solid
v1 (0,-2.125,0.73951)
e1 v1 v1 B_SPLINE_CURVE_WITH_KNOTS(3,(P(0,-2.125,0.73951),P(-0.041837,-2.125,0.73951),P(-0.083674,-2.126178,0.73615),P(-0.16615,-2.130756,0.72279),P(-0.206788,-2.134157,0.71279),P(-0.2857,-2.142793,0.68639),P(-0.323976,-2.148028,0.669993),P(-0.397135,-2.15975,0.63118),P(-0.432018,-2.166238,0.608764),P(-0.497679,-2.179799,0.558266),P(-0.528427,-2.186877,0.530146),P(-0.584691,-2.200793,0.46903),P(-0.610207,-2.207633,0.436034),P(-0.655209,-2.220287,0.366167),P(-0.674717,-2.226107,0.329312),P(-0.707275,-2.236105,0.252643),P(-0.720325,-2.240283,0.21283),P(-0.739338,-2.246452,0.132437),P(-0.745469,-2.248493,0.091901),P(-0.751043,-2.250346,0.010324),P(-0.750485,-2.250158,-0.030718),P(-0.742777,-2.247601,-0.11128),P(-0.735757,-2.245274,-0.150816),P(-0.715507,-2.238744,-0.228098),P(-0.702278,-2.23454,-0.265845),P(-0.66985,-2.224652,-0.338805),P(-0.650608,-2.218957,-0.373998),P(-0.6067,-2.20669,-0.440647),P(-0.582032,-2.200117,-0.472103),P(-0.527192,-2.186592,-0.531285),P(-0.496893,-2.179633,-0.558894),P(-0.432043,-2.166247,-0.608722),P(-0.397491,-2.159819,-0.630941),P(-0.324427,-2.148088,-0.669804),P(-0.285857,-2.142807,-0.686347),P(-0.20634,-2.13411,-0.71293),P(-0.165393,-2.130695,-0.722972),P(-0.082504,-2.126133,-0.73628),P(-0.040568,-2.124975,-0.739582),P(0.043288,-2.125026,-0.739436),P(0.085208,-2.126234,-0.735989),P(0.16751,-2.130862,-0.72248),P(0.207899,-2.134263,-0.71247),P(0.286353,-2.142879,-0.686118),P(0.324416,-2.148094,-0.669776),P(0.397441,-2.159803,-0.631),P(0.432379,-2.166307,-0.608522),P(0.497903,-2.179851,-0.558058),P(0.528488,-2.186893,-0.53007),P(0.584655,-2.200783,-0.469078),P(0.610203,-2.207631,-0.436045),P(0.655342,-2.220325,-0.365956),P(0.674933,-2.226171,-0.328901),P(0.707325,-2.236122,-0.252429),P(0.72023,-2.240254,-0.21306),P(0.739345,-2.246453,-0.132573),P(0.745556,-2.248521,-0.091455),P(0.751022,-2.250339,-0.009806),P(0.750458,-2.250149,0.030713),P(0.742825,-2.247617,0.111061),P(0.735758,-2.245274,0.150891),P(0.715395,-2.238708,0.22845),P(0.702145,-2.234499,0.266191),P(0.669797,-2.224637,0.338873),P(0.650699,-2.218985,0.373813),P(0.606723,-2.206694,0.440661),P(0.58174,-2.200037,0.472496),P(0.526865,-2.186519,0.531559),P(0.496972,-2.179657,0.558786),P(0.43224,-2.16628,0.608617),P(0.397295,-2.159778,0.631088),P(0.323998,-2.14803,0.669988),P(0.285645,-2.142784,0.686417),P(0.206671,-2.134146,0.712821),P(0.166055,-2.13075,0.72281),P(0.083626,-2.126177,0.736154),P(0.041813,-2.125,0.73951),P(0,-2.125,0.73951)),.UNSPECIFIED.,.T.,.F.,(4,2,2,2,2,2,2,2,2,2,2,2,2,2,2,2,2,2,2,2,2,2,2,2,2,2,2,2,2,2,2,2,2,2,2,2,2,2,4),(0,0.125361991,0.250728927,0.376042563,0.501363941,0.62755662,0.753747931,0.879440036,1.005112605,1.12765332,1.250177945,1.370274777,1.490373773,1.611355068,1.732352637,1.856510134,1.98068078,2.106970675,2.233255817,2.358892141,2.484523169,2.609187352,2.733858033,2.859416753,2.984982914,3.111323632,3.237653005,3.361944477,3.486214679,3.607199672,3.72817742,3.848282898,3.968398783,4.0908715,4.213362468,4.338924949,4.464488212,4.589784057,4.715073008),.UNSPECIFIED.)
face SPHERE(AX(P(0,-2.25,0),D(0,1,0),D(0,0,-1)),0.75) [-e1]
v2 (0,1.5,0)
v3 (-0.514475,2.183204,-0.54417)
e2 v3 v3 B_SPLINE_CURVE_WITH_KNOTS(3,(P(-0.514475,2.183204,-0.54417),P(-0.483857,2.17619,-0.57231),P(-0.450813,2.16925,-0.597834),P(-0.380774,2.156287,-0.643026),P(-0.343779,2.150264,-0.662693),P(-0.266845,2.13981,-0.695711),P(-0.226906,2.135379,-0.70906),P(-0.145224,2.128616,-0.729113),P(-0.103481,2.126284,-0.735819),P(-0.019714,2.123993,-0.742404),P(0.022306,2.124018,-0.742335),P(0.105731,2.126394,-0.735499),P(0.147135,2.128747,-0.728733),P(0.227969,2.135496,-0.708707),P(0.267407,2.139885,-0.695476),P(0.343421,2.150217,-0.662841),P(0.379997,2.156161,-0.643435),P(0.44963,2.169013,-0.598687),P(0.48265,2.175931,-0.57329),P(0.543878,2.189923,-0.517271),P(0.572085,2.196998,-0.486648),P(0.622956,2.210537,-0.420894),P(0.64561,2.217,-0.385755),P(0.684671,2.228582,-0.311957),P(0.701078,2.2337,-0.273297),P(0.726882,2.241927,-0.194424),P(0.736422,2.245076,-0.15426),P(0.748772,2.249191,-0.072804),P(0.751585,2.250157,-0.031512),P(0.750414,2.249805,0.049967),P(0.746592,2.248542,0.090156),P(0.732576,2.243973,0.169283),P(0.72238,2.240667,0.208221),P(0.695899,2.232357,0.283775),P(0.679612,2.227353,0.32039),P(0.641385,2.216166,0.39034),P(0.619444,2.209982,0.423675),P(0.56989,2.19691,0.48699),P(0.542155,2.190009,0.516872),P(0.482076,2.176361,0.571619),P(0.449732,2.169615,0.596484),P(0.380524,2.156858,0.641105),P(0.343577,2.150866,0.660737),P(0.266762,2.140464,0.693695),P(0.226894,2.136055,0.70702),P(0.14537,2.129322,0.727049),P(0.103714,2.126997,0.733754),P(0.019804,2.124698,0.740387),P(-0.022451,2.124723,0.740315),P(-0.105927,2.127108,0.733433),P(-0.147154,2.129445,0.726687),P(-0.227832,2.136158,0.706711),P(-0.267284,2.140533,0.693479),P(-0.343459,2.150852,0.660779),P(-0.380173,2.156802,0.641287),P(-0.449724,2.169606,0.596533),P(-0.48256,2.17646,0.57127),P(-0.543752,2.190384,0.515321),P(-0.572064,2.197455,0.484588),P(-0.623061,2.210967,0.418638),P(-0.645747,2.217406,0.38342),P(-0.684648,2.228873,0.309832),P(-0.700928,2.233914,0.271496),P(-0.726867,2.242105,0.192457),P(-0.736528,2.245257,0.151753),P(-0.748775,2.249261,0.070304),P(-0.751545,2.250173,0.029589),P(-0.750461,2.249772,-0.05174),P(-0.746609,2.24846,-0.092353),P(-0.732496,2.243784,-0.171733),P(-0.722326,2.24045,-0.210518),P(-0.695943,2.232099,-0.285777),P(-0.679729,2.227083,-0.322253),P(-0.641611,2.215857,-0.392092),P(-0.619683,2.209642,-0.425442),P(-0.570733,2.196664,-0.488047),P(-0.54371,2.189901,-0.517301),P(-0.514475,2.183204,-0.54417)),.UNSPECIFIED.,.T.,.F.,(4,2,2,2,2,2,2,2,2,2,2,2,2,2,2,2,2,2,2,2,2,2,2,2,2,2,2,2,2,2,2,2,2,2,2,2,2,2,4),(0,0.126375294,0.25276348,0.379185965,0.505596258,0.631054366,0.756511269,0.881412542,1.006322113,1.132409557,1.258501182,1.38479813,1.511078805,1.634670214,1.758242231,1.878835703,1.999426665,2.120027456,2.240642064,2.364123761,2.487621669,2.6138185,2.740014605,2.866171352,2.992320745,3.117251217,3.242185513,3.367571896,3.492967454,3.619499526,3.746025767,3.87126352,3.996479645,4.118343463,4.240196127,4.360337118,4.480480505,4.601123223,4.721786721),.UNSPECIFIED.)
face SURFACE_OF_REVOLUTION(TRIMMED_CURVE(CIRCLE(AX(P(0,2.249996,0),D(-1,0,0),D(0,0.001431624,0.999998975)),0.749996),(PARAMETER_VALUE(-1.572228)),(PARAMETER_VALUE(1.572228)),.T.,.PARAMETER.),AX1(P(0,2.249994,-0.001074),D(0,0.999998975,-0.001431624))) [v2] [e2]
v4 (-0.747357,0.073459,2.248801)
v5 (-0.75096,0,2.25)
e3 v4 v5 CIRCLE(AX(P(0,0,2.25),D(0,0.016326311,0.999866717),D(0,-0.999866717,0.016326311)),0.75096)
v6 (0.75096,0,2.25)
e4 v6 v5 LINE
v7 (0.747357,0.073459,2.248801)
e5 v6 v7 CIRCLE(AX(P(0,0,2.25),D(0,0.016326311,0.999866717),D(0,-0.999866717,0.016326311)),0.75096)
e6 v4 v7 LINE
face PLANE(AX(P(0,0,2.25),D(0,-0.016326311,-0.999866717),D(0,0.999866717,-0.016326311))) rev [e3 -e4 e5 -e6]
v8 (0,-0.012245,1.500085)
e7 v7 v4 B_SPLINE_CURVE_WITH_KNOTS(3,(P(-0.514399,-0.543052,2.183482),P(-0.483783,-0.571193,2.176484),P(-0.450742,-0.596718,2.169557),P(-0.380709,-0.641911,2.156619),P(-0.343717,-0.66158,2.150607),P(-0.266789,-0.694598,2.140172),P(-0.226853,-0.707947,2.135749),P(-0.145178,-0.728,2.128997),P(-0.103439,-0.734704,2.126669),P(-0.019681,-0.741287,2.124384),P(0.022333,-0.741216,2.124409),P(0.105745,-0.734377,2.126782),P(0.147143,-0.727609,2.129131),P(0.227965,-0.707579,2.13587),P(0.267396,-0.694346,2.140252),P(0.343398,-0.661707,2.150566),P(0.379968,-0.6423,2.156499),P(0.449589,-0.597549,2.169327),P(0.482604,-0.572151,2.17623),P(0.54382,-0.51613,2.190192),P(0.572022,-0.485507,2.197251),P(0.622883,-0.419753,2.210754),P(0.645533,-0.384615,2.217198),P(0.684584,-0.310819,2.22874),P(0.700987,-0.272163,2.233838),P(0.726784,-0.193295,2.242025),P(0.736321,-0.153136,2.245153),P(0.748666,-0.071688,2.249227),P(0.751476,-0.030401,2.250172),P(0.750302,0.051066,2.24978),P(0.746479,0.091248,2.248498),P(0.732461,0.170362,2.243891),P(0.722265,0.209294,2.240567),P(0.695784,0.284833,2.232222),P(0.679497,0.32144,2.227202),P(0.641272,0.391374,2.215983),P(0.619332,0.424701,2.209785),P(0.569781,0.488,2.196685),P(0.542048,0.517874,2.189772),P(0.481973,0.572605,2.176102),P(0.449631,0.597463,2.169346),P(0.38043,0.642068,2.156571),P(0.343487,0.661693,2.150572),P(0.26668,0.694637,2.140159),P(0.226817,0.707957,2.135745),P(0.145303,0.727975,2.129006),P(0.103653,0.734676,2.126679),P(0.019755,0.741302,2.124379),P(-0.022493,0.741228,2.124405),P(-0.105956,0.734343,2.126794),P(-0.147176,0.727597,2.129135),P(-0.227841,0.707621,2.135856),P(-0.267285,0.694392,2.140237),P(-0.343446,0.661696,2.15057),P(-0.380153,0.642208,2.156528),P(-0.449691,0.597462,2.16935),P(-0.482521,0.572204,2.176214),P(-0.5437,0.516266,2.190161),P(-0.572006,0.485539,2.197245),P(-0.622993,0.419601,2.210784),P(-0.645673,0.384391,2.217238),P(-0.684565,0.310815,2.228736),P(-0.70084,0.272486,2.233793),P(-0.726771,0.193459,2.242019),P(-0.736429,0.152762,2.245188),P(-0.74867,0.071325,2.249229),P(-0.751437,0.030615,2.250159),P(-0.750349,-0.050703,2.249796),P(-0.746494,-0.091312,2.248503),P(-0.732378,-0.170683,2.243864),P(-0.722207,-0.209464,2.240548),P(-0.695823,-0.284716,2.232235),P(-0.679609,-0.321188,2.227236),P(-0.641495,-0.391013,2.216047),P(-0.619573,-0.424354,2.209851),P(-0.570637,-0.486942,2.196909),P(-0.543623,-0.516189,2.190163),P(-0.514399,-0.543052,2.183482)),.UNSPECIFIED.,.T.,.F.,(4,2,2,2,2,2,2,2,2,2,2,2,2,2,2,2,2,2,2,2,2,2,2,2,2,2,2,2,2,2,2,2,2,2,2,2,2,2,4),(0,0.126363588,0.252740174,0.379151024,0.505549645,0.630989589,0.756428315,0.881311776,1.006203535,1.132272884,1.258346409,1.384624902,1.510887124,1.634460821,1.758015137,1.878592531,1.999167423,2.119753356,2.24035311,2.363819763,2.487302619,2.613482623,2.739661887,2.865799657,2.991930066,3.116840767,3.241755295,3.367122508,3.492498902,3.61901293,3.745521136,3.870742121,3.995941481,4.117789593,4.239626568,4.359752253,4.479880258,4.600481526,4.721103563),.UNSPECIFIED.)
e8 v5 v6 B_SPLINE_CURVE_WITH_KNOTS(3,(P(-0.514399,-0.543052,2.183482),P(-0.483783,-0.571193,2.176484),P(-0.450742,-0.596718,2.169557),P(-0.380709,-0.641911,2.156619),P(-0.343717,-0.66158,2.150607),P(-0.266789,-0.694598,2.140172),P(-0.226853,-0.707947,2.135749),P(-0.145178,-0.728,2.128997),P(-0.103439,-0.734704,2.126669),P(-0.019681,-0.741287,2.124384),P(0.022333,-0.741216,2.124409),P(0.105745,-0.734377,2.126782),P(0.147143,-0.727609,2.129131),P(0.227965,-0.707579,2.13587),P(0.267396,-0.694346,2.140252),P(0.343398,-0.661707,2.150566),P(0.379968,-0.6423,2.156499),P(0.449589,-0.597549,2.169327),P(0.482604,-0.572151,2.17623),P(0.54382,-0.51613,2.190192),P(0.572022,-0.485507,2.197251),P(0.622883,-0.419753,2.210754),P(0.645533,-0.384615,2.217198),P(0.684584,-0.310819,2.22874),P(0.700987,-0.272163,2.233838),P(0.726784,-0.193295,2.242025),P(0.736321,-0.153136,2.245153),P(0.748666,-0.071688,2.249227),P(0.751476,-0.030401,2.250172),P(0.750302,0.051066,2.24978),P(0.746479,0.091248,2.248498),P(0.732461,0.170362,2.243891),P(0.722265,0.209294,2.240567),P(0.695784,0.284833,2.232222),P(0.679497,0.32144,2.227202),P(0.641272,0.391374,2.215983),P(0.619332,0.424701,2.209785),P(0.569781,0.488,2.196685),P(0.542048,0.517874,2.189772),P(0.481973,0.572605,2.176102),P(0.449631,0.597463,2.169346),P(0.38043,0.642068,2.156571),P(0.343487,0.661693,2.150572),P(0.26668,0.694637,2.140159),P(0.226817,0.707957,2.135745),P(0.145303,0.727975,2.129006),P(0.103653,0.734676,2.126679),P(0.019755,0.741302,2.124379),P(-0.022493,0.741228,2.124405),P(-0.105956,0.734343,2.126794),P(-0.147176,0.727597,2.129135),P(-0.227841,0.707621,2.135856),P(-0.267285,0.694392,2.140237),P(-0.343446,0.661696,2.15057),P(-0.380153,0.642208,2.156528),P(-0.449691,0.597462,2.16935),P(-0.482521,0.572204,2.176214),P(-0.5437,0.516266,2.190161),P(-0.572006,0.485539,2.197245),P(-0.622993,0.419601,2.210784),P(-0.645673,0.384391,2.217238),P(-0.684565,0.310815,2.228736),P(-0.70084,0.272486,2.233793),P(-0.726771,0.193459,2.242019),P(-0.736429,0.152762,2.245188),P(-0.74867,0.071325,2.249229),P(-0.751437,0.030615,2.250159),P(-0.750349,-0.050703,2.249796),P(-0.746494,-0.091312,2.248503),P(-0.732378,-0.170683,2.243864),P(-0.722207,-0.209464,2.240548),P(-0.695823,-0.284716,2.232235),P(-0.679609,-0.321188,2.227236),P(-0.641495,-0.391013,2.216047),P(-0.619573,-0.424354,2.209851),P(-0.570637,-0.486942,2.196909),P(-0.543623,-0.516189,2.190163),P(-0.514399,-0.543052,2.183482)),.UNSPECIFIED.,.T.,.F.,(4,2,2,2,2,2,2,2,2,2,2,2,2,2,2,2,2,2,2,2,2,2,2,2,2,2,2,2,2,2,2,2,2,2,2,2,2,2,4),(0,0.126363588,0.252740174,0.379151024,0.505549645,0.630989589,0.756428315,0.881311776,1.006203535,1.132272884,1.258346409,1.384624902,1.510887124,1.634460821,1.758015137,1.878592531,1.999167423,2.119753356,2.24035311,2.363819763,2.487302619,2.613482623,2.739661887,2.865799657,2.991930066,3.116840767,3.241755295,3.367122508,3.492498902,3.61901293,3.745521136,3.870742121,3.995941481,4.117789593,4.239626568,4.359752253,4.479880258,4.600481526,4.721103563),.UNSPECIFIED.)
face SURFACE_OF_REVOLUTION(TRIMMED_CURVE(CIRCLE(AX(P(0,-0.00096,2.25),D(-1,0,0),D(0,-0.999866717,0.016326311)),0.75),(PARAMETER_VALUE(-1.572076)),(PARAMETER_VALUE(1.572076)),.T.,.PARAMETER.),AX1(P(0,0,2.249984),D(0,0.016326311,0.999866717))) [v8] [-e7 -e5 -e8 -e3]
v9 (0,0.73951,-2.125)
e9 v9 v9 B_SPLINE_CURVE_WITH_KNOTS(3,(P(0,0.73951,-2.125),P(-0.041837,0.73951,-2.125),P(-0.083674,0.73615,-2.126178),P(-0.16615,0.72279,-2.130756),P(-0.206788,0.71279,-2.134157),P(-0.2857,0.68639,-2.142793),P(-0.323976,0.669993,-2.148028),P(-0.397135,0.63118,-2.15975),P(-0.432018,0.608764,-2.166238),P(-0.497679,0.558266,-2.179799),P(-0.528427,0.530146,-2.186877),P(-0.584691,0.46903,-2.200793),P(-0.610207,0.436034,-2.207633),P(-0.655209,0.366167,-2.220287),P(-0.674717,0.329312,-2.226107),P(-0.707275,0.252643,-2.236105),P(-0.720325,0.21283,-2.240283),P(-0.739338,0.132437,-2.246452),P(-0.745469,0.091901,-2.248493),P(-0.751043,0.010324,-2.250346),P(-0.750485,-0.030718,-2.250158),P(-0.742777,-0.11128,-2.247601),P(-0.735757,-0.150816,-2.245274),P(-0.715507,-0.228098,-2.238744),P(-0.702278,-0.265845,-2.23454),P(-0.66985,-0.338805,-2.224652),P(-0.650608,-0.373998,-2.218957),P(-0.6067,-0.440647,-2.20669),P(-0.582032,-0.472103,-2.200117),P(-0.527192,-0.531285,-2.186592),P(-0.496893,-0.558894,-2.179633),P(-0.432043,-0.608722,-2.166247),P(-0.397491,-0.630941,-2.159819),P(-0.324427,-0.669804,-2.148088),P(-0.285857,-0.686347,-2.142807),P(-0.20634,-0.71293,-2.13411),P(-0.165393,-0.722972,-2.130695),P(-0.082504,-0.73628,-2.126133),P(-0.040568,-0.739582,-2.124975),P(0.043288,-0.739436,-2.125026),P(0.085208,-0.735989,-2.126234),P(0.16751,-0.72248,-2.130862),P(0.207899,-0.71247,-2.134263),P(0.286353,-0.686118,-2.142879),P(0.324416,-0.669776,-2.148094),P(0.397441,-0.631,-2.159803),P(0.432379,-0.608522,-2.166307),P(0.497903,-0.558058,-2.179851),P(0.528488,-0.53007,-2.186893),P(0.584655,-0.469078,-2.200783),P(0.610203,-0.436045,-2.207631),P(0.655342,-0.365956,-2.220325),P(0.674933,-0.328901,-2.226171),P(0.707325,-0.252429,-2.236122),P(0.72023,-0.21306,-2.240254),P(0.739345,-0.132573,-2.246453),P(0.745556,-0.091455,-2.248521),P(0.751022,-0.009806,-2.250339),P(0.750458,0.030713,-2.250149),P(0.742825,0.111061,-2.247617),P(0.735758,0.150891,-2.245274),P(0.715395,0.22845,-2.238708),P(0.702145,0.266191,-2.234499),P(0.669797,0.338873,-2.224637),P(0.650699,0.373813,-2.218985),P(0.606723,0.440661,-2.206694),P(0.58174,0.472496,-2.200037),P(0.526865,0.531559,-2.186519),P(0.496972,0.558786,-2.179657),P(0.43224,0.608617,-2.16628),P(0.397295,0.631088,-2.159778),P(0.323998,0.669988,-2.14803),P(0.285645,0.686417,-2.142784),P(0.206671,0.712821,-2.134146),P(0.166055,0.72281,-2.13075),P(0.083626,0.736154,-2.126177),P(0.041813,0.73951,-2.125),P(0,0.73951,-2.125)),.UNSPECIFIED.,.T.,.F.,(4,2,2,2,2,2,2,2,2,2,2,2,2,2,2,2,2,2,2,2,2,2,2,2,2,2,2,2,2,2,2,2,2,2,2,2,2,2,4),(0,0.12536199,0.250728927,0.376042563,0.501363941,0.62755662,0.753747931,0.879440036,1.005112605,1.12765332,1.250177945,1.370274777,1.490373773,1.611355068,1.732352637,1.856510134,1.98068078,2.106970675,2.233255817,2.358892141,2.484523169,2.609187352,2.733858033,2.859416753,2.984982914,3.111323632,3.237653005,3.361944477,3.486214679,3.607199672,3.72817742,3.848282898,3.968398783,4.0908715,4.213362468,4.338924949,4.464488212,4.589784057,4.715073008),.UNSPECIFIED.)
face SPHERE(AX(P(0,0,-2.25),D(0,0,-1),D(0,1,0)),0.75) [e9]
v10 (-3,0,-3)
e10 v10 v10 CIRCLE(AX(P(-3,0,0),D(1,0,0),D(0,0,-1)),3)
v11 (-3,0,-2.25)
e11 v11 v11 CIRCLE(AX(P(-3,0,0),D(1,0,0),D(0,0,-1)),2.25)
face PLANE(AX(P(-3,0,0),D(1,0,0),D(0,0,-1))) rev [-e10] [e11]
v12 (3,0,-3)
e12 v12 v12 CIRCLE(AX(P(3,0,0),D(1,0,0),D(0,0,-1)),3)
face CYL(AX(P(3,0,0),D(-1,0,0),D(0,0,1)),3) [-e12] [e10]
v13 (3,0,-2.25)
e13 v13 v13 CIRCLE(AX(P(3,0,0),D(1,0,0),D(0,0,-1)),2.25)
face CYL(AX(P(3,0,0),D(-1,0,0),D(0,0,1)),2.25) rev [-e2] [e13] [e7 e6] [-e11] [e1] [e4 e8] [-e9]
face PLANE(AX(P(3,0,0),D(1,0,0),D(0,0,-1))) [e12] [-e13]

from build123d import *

# Parameters (mm, degrees)
SKETCH2_R           = 3
SKETCH2_R_2         = 2.25
BOSS_EXTRUDE1_DEPTH = 3


with BuildPart() as part:
    # Sketch2 → Boss-Extrude1 (new, symmetric)
    with BuildSketch(Plane(origin=(0, 0, 0), x_dir=(0, 0, -1), z_dir=(1, 0, 0))):
        Circle(SKETCH2_R)
        Circle(SKETCH2_R_2, mode=Mode.SUBTRACT)
    extrude(amount=BOSS_EXTRUDE1_DEPTH, both=True)

    # Sketch8 → Revolve18 (revolve)
    with BuildSketch(Plane(origin=(0, 0, 0), x_dir=(0, 0, -1), z_dir=(1, 0, 0))):
        with BuildLine():
            Line((-2.25, 0), (-2.237739596, 0.750859778))
            ThreePointArc((-2.237739596, 0.750859778), (-1.7107227, 0.52222122), (-1.500084905, -0.012244979))
            Line((-1.500084905, -0.012244979), (-2.25, 0))
        make_face()
    revolve(axis=Axis((0, 0, 2.25), (0, -0.016326311142728266, -0.999866716900043)))

    # Sketch10 → Revolve19 (revolve)
    with BuildSketch(Plane(origin=(0, 0, 0), x_dir=(0, 0, -1), z_dir=(1, 0, 0))):
        with BuildLine():
            Line((2.25, 0), (2.25, 0.75))
            ThreePointArc((2.25, 0.75), (1.719669914, 0.530330086), (1.5, 0))
            Line((1.5, 0), (2.25, 0))
        make_face()
    revolve(axis=Axis((0, 0, -2.25), (0, 0, 1)))


with BuildPart() as revolve20_tool:
    # Sketch11 → Revolve20 (revolve)
    with BuildSketch(Plane(origin=(0, 0, 0), x_dir=(0, 0, -1), z_dir=(1, 0, 0))):
        with BuildLine():
            Line((0.001073711, 2.249994313), (-0.749995081, 2.251069562))
            ThreePointArc((-0.749995081, 2.251069562), (-0.53070663, 1.720048449), (0, 1.5))
            Line((0, 1.5), (0.001073711, 2.249994313))
        make_face()
    revolve(axis=Axis((0, 2.249994313, -0.001073711), (0, -0.9999989752258402, 0.0014316239972306517)))


with BuildPart() as part_1:
    add(part.part)


with BuildPart() as part_2:
    # Revolve20: joined with revolve20_tool
    add(part_1.part.fuse(revolve20_tool.part, tol=0.00001))

    # Sketch13 → Revolve21 (revolve)
    with BuildSketch(Plane(origin=(0, 0, 0), x_dir=(0, 0, -1), z_dir=(1, 0, 0))):
        with BuildLine():
            Line((0, -1.5), (0, -2.25))
            Line((0, -2.25), (0.75, -2.25))
            ThreePointArc((0.75, -2.25), (0.530330086, -1.719669914), (0, -1.5))
        make_face()
    revolve(axis=Axis((0, -1.5, 0), (0, -1, 0)))


solid = part_2.part
